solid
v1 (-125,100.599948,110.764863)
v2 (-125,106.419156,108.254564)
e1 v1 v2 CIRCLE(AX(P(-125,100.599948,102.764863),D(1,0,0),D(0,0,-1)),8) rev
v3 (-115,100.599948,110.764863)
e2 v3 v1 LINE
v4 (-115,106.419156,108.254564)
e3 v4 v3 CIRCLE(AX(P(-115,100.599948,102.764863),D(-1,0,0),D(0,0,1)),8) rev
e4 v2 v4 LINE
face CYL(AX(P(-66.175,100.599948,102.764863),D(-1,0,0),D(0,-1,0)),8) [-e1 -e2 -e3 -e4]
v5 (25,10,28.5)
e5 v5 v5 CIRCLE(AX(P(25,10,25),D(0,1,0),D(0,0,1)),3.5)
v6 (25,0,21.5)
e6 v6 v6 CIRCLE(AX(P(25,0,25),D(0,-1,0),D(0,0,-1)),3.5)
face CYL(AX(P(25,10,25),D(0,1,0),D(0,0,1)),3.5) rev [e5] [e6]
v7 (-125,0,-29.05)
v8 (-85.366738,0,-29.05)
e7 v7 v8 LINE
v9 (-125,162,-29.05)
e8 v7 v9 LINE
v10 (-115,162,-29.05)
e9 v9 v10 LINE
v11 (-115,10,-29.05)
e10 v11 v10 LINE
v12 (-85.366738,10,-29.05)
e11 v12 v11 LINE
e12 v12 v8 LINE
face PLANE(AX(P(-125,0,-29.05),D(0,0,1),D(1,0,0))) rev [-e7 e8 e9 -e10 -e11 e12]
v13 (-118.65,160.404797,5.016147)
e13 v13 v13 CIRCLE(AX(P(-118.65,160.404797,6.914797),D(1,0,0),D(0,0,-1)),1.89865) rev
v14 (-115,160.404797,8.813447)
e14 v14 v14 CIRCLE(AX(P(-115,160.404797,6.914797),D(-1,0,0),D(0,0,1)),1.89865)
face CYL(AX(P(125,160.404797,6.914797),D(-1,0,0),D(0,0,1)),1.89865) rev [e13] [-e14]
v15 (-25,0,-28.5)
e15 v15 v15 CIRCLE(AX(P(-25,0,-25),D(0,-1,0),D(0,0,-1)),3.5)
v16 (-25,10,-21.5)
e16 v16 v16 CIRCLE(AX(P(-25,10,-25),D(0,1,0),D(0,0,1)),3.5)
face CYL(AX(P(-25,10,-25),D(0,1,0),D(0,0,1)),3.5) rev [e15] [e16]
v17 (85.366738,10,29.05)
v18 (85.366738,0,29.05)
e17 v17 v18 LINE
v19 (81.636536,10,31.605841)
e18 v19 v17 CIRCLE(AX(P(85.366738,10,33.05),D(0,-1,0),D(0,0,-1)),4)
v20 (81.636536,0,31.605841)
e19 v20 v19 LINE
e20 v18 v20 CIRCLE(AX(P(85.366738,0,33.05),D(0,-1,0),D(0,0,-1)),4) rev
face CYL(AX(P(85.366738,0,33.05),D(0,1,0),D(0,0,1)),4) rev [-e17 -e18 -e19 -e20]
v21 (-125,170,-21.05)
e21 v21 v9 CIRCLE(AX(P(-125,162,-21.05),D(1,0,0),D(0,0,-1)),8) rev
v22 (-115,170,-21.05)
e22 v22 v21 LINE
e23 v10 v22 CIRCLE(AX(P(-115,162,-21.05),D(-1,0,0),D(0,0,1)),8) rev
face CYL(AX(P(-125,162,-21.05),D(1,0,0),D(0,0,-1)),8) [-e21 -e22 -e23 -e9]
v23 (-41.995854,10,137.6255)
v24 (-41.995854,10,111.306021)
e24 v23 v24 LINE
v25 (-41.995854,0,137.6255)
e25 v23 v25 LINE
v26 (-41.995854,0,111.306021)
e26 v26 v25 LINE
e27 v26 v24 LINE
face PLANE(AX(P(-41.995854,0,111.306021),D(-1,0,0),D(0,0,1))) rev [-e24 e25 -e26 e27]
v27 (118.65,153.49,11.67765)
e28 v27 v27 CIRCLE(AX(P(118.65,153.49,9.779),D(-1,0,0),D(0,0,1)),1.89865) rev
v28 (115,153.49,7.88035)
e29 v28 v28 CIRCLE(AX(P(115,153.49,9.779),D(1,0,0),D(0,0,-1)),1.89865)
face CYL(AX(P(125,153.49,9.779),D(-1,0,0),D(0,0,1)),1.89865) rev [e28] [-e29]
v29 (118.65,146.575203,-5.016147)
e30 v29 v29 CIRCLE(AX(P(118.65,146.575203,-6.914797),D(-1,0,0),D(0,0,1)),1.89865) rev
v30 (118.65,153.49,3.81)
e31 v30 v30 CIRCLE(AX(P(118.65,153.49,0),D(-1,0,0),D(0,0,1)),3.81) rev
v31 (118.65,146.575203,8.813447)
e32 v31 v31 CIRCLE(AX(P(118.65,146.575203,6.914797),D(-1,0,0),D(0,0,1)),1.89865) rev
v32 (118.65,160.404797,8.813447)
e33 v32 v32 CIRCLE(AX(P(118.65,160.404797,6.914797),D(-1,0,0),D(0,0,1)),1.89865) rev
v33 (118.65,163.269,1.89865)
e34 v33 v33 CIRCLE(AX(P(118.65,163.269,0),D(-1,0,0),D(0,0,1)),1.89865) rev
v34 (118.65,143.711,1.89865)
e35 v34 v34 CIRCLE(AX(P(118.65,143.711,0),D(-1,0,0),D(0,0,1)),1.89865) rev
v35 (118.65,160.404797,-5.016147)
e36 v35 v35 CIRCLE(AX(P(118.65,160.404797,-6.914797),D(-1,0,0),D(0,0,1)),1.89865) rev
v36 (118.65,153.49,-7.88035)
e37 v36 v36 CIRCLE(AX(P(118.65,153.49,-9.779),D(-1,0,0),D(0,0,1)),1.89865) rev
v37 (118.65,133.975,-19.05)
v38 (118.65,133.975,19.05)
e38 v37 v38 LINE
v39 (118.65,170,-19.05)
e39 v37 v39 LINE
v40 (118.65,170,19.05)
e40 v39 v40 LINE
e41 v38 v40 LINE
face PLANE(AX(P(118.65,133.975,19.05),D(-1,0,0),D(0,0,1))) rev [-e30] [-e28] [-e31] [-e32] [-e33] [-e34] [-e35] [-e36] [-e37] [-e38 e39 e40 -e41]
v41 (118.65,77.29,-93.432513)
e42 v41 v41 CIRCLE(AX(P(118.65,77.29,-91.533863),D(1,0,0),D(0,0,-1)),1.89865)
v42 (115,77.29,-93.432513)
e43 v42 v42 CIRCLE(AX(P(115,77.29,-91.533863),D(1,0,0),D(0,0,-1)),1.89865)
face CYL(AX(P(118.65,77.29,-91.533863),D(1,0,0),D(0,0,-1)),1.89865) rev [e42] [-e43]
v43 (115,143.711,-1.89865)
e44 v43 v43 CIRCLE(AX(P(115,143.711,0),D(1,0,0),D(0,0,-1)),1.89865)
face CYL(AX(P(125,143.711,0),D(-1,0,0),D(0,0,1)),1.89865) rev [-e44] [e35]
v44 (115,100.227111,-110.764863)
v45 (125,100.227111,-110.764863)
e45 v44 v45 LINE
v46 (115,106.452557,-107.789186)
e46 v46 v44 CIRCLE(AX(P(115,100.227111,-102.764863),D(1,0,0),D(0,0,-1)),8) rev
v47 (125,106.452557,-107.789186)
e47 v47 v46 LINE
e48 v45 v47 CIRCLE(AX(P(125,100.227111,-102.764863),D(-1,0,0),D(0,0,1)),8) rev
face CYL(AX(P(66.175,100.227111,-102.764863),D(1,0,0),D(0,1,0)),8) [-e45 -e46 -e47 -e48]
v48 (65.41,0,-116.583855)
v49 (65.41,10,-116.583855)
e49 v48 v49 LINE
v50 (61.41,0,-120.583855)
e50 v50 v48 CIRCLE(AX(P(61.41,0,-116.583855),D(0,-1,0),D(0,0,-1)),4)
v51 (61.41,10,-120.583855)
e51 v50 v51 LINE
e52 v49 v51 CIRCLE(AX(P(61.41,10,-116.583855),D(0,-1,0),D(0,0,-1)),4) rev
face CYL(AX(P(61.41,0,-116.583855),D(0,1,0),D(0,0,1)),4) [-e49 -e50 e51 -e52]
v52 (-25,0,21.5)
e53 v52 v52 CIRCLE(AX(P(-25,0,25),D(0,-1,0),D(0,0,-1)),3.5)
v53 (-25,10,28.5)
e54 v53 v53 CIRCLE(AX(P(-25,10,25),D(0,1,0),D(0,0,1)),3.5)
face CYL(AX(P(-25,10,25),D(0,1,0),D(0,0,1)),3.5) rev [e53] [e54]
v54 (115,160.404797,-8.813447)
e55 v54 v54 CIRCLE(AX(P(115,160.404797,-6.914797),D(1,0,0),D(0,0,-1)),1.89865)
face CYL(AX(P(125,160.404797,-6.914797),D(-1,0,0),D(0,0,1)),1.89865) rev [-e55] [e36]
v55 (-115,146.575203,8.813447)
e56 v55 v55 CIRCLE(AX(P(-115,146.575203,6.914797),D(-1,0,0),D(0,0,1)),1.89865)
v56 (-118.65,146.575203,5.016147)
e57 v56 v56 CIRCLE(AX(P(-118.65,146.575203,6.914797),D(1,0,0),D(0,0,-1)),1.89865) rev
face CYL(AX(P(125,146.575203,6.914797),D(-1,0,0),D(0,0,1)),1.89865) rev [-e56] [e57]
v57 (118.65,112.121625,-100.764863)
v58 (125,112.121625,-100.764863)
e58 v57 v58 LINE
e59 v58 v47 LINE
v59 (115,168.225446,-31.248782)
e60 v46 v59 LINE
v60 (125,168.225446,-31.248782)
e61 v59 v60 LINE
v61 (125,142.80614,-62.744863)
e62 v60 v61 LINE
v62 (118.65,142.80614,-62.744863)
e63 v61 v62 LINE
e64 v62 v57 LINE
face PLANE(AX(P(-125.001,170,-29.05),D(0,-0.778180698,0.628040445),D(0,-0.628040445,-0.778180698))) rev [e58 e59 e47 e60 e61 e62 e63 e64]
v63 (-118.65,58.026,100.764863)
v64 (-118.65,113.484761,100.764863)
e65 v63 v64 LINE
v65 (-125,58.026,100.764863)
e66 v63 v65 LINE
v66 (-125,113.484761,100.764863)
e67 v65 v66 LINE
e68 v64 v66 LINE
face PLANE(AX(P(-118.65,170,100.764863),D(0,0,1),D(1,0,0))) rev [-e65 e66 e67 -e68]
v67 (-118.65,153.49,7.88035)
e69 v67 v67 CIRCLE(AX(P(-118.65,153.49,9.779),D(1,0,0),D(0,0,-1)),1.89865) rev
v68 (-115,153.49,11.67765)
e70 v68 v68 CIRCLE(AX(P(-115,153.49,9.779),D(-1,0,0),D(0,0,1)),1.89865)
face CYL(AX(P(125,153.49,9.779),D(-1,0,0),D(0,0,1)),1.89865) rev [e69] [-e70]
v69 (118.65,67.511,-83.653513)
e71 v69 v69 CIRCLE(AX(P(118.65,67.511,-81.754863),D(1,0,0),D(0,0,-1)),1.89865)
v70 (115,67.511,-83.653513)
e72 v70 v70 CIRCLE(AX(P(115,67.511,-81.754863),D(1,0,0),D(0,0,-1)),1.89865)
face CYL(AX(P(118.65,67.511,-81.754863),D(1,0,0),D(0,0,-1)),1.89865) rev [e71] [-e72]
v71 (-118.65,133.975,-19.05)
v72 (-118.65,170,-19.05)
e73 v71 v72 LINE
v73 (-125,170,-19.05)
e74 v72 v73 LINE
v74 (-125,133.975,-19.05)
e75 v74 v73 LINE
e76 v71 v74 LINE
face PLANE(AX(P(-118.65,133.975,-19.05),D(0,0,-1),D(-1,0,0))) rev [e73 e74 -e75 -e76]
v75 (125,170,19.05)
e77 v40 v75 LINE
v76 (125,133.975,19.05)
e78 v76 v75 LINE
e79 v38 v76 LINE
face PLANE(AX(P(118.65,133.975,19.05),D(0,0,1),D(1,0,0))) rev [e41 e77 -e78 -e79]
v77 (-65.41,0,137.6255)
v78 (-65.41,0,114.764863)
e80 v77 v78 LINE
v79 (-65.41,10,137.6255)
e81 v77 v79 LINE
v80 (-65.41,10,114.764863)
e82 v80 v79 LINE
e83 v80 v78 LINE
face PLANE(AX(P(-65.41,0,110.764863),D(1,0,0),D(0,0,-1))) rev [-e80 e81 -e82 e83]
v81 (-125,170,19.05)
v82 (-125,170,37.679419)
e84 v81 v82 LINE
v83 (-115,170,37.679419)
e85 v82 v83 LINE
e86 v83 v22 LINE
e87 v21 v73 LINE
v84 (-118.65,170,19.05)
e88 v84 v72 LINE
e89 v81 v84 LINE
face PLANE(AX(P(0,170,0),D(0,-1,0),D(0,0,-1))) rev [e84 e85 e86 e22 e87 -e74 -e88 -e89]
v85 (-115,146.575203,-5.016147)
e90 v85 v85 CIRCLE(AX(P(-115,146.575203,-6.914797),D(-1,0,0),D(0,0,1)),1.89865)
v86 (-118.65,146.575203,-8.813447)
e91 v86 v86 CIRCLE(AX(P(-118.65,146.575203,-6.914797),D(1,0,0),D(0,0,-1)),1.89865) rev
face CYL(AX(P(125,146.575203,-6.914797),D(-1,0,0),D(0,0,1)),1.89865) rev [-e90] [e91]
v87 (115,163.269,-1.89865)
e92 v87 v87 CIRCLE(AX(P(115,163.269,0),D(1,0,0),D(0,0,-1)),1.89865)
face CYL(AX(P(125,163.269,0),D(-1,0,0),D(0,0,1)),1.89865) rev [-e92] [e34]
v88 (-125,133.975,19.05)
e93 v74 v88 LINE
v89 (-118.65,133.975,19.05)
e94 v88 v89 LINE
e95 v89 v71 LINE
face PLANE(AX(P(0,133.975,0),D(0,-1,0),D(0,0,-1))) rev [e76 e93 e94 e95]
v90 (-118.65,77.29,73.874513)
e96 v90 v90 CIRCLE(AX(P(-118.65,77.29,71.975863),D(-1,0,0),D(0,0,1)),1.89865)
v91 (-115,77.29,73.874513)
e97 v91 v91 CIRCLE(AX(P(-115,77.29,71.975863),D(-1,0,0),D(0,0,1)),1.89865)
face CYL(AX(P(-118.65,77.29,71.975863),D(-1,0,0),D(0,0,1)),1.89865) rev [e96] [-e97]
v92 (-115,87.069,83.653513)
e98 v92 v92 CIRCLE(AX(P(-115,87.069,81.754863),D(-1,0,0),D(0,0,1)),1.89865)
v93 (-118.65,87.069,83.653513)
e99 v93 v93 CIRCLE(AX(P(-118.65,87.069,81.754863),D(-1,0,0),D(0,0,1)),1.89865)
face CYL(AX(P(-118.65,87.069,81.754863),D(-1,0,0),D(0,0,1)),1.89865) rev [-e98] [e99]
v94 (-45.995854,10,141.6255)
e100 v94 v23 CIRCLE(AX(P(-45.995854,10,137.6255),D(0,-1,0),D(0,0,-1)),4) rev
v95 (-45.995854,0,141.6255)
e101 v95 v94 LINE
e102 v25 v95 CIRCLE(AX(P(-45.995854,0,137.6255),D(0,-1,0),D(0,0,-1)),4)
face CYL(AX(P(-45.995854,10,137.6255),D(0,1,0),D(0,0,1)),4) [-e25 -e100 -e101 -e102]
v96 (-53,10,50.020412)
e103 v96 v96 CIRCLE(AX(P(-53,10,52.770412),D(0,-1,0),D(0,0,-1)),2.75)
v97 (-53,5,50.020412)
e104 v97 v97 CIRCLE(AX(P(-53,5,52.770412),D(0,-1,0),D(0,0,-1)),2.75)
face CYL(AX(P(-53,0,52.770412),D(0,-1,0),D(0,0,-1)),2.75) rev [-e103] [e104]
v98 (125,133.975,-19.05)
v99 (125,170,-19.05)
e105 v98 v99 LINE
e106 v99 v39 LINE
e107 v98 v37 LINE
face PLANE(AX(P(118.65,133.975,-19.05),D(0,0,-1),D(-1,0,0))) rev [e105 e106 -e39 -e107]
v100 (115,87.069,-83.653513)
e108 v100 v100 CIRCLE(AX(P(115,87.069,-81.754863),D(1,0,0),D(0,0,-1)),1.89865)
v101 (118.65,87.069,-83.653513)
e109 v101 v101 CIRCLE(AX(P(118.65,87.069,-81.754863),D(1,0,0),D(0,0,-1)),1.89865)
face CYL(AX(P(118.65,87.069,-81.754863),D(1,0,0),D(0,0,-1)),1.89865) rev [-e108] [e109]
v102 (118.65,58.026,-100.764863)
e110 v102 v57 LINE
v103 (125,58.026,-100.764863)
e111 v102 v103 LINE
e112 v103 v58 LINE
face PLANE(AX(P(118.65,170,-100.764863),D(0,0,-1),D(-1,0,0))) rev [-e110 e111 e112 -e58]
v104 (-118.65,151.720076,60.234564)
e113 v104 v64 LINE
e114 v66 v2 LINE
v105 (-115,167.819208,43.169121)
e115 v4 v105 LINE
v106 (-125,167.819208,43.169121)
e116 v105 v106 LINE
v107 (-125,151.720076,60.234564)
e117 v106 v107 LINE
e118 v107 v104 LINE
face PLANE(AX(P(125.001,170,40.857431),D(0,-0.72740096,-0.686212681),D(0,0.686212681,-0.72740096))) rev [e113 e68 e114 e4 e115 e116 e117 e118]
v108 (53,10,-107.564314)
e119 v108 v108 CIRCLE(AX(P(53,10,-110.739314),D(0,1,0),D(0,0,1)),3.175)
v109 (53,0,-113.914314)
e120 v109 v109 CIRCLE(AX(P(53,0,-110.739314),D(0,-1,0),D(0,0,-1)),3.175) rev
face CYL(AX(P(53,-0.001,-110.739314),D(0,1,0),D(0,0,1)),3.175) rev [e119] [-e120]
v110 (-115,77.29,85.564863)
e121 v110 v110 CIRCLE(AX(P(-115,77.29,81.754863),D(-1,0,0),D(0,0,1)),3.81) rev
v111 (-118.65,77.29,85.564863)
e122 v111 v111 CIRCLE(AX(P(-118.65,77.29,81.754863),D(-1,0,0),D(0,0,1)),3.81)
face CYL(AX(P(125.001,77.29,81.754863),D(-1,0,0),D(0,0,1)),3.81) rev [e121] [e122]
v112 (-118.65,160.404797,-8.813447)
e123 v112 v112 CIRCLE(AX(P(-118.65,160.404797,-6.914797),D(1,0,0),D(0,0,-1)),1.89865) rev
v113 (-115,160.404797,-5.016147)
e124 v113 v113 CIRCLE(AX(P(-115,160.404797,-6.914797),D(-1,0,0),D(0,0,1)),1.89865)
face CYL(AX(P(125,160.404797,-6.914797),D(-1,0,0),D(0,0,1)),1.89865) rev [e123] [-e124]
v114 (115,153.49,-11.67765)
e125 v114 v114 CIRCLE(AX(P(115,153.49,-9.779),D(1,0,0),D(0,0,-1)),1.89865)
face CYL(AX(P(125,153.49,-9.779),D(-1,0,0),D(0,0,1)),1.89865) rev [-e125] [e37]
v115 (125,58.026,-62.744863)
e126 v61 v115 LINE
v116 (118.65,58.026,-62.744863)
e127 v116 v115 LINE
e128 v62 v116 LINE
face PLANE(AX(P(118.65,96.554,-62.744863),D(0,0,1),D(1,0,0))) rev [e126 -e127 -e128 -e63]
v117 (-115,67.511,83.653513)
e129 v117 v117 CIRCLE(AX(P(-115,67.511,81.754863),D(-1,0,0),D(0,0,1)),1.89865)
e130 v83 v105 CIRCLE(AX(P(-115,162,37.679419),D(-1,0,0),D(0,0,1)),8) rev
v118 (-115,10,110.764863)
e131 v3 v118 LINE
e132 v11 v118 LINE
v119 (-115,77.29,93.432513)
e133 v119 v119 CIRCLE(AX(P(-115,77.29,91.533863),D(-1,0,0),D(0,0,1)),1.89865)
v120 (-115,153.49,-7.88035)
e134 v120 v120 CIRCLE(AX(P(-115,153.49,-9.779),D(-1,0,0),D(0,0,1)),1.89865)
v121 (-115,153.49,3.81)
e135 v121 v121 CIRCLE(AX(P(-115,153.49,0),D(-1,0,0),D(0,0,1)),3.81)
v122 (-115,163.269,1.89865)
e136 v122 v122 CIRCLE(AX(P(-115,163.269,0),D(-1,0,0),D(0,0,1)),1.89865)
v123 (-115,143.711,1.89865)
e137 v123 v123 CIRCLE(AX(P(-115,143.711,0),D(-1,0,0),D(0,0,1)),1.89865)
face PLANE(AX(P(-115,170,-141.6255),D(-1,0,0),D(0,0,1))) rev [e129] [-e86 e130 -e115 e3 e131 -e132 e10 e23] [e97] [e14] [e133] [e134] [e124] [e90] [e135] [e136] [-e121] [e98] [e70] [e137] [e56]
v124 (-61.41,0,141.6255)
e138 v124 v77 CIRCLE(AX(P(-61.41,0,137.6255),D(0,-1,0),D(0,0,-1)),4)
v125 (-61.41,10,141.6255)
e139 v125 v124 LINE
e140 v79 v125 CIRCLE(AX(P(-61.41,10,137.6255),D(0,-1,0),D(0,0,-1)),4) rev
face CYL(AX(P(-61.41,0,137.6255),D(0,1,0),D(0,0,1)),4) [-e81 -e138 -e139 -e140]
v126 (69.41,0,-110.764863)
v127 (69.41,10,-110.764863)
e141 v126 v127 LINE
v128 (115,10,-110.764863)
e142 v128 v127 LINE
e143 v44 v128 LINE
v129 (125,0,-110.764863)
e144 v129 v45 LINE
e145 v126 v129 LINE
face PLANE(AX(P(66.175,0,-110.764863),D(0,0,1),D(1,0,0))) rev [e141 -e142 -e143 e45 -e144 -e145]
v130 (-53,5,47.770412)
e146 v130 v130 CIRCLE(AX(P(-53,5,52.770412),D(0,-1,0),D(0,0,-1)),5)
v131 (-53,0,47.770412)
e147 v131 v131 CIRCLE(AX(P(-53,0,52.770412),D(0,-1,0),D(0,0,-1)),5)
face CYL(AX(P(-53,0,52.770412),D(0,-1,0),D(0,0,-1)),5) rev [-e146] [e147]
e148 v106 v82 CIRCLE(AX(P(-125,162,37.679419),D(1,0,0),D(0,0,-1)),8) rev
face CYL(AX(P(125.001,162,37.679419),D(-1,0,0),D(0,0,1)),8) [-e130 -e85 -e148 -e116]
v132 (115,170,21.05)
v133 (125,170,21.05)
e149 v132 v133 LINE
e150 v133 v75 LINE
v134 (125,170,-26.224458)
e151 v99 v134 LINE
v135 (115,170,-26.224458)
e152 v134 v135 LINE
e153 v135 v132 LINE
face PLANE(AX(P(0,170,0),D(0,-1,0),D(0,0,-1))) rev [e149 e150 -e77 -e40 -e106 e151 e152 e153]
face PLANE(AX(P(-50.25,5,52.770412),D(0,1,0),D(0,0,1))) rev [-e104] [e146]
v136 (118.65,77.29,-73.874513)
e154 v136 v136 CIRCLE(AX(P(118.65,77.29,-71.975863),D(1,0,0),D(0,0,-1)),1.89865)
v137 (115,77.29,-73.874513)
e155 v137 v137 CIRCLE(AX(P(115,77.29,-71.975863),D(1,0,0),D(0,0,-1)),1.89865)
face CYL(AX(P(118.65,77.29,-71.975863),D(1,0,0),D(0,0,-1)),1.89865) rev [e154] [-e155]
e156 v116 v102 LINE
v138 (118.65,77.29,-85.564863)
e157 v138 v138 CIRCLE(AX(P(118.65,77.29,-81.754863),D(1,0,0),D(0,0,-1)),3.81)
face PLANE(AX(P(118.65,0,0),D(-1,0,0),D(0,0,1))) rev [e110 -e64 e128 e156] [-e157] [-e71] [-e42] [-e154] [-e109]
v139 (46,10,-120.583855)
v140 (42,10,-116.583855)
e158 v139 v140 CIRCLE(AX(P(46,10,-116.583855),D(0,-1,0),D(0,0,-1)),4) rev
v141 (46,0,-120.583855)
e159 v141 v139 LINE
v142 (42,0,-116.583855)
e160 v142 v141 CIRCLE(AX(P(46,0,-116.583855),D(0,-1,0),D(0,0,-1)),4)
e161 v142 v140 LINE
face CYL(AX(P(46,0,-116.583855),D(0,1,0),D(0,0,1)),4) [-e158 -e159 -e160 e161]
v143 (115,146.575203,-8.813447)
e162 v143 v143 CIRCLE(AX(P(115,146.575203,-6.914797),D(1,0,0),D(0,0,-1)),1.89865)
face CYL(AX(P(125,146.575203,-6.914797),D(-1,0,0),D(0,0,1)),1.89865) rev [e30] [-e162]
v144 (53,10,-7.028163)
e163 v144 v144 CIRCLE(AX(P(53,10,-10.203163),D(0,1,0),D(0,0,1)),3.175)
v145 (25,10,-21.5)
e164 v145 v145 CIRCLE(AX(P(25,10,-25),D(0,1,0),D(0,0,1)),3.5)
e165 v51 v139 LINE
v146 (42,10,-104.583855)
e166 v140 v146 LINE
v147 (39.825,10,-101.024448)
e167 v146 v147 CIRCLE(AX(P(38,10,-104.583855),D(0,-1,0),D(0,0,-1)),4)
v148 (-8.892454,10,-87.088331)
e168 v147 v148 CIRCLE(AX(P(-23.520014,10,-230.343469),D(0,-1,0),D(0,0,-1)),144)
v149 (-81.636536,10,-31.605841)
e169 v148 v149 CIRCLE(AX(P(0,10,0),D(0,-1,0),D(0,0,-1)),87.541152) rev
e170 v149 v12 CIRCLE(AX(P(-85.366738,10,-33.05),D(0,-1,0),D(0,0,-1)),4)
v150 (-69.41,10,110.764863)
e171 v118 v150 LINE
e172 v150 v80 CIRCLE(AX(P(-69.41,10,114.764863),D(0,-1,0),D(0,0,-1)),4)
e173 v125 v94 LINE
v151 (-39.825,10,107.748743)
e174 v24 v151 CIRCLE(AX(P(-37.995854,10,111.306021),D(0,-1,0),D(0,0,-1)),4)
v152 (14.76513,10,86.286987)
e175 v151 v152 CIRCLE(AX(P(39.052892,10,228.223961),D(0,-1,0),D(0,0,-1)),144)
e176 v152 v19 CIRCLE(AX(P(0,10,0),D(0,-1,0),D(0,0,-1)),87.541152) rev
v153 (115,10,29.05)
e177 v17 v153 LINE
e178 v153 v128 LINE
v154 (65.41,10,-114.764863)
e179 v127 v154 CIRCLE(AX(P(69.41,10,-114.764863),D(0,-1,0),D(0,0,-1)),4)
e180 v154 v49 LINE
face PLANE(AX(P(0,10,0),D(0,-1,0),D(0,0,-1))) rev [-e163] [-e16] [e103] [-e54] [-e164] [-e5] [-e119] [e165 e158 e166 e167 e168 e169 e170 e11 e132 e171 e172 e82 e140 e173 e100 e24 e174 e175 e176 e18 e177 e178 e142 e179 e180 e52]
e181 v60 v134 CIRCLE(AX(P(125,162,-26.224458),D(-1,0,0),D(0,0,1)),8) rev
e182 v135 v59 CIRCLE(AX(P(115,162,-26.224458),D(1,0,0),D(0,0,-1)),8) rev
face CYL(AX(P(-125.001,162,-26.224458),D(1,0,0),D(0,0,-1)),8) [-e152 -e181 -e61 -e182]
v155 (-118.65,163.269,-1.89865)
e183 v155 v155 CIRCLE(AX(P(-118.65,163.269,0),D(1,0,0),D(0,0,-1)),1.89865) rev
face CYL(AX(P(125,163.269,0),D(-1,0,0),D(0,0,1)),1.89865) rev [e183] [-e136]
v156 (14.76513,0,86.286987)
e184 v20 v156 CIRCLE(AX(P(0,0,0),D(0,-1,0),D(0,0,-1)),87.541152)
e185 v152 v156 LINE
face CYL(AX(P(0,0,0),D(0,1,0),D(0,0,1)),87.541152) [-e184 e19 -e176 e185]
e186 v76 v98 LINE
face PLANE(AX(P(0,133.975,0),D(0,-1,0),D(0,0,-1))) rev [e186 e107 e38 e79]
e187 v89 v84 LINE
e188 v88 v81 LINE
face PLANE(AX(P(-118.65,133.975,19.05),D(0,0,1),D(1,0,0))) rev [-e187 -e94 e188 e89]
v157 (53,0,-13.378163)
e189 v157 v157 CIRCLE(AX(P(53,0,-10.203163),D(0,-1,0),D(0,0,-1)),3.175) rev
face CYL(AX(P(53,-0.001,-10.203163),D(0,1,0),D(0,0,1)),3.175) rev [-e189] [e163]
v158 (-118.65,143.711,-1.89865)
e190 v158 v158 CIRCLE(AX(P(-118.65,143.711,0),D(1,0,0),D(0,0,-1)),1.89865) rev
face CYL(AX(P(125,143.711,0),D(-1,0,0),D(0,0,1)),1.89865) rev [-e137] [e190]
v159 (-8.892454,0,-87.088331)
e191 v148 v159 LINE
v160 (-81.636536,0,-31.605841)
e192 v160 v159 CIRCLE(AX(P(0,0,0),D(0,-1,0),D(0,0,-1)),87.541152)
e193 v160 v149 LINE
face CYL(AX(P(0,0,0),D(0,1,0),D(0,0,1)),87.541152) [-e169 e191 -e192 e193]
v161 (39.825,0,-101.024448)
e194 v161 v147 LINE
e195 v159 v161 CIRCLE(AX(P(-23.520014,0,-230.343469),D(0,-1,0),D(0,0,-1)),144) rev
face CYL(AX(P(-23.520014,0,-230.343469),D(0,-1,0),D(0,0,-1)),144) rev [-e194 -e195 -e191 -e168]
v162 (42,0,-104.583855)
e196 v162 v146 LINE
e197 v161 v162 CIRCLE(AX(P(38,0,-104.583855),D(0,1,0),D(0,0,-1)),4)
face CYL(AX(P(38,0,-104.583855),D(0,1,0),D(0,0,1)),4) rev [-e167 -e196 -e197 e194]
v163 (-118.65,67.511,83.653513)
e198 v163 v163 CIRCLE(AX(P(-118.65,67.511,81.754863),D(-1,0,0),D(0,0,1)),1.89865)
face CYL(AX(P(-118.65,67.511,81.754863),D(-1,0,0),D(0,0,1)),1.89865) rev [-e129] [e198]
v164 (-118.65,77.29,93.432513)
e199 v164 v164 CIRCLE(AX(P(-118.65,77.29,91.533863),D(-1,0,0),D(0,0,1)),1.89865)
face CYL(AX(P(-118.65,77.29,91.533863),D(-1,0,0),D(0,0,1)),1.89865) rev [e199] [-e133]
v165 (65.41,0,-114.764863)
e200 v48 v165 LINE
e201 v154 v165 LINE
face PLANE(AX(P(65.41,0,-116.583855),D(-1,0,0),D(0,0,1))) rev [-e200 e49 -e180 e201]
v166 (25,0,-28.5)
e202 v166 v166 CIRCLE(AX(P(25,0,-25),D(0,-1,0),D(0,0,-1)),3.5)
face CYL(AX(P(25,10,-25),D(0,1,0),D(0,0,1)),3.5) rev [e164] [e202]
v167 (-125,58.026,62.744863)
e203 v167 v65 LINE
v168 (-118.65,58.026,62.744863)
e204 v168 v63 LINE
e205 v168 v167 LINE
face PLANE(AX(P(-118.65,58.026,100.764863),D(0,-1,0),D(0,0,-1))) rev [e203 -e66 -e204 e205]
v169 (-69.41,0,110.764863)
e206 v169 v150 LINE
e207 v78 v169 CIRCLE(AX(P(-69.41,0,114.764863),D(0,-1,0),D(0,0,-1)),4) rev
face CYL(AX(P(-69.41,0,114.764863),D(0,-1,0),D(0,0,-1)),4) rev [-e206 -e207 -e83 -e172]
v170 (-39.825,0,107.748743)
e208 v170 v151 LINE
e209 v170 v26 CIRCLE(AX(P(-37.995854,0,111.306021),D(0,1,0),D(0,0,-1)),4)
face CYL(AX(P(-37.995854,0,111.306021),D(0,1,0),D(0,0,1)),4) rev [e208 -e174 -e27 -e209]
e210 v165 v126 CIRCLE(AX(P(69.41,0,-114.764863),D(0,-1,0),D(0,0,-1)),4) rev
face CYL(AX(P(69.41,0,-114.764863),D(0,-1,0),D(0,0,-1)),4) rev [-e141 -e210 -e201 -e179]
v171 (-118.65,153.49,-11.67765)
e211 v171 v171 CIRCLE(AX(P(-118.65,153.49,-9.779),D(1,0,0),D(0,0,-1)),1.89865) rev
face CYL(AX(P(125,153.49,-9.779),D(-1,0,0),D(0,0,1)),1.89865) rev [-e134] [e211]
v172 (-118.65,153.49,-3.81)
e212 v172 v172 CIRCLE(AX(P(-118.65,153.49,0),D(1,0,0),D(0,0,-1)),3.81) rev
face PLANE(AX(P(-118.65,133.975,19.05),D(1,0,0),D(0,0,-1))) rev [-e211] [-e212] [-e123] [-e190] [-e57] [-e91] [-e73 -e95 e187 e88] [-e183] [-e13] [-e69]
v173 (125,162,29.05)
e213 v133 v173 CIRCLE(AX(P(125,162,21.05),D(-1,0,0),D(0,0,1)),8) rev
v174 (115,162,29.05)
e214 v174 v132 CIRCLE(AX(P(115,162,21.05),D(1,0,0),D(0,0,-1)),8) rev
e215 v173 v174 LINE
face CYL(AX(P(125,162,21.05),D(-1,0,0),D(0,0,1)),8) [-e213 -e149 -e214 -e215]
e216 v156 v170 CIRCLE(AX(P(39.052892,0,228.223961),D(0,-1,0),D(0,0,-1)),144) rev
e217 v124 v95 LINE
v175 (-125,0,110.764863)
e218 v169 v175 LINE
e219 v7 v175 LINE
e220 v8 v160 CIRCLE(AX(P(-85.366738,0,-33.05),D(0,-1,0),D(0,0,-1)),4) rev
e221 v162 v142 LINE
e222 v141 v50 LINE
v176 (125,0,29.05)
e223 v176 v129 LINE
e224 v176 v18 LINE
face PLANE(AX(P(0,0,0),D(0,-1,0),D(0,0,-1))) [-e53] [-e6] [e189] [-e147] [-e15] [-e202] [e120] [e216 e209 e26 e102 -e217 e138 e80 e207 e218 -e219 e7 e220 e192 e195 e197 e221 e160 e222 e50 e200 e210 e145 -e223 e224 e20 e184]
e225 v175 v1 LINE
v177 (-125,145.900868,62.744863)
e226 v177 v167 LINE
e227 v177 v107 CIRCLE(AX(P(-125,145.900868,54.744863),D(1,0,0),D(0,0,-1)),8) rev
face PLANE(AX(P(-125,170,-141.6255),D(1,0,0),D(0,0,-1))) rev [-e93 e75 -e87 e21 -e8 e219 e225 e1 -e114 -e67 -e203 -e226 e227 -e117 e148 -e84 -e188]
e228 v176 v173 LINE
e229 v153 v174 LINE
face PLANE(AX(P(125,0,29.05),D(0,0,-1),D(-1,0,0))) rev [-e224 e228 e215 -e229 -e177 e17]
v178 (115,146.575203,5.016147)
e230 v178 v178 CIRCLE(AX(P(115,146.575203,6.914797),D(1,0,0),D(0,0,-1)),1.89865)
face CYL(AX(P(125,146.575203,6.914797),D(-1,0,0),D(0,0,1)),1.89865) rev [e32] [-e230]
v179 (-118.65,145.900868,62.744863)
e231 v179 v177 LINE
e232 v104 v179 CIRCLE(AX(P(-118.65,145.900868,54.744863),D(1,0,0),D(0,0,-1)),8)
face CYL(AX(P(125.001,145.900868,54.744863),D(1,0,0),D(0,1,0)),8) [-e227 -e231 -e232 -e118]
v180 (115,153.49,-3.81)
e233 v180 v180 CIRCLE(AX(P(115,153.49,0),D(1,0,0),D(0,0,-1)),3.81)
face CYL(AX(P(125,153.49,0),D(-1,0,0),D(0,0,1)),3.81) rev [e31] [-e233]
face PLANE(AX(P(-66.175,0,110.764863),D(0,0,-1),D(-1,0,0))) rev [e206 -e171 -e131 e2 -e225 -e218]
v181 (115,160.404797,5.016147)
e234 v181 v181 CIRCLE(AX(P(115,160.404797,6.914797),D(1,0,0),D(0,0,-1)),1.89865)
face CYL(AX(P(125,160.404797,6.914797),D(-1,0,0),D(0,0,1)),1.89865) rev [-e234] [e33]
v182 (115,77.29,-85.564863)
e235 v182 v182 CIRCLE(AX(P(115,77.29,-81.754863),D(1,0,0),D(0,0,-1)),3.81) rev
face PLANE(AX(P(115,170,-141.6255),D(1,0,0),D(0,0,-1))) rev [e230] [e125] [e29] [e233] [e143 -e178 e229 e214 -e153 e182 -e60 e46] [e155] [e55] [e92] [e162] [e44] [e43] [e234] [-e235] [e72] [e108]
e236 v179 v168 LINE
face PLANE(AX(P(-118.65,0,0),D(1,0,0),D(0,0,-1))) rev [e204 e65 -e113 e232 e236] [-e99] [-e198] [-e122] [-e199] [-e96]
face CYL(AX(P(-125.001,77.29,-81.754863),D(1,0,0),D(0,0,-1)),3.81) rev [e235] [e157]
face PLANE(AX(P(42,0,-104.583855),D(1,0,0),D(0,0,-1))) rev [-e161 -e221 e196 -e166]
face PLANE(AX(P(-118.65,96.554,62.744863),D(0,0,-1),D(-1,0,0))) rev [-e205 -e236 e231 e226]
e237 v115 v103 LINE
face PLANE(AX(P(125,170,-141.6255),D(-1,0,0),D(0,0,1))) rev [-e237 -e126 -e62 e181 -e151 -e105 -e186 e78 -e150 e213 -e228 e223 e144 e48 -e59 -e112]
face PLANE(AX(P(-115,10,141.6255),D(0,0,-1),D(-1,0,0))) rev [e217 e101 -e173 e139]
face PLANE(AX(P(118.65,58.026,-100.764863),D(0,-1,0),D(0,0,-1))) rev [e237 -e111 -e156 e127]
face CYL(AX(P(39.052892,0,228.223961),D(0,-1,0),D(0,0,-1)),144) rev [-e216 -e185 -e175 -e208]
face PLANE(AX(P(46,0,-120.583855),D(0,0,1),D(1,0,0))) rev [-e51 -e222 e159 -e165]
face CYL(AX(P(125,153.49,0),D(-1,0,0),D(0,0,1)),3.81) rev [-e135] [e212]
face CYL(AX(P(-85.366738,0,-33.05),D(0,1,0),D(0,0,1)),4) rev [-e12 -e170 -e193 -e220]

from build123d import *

# Parameters (mm, degrees)
SKETCH2_W                      = 230
SKETCH2_H                      = 283.251
BOSS_EXTRUDE1_DEPTH            = 10
SKETCH3_W                      = 10
SKETCH3_H                      = 283.251
BOSS_EXTRUDE2_DEPTH            = 170
M6_CLEARANCE_HOLE1_D           = 7
CUT_EXTRUDE1_DEPTH             = 327.431895271
CUT_EXTRUDE1_DEPTH_BACK        = 327.431895271
SKETCH7_R                      = 3.81
SKETCH7_R_2                    = 1.89865
SKETCH8_W                      = 6.35
SKETCH8_H                      = 38.1
CUT_EXTRUDE2_DEPTH             = 36.025
CUT_EXTRUDE3_DEPTH             = 6.35
CUT_EXTRUDE4_REACH             = 331.125
SKETCH11_R                     = 3.81
F_6_CLEARANCE_HOLE1_D          = 3.7973
F_6_CLEARANCE_HOLE1_DEPTH      = 3.65
CIRPATTERN1_COUNT              = 2
ENL_V_MAT_EXTRU_1_REACH        = 249.554
ESQUISSE1_R                    = 3.175
CBORE_FOR_M5_SHCS1_D           = 5.5
CBORE_FOR_M5_SHCS1_CBORE_D     = 10
CBORE_FOR_M5_SHCS1_CBORE_DEPTH = 5
CUT_EXTRUDE5_DEPTH             = 248.553594703
CUT_EXTRUDE5_DEPTH_BACK        = 248.553594703
SKETCH15_W                     = 58.825
SKETCH15_H                     = 30.860637148
CUT_EXTRUDE7_DEPTH             = 248.553594703
CUT_EXTRUDE7_DEPTH_BACK        = 248.553594703
SKETCH20_W                     = 0.765
SKETCH20_H                     = 30.860637148
FILLET2_R                      = 4
FILLET3_R                      = 144
FILLET4_R                      = 4
CUT_EXTRUDE8_REACH             = 335.853
CUT_EXTRUDE9_REACH             = 335.853
FILLET5_R                      = 8
FILLET6_R                      = 8


with BuildPart() as part:
    # Sketch2 → Boss-Extrude1 (new body)
    with BuildSketch(Plane(origin=(0, 0, 0), x_dir=(1, 0, 0), z_dir=(0, 1, 0))):
        Rectangle(SKETCH2_W, SKETCH2_H)
    extrude(amount=BOSS_EXTRUDE1_DEPTH)

    # Sketch3 → Boss-Extrude2 (add)
    with BuildSketch(Plane(origin=(0, 0, 0), x_dir=(1, 0, 0), z_dir=(0, 1, 0))):
        with Locations((-120, 0)):
            Rectangle(SKETCH3_W, SKETCH3_H)
        with Locations((120, 0)):
            Rectangle(SKETCH3_W, SKETCH3_H)
    extrude(amount=BOSS_EXTRUDE2_DEPTH)

    # M6 Clearance Hole1 (through all)
    with Locations(Plane(origin=(0, 10, 0), x_dir=(1, 0, 0), z_dir=(0, 1, 0))):
        with Locations((-25, 25), (25, 25), (25, -25), (-25, -25)):
            Hole(M6_CLEARANCE_HOLE1_D / 2)

    # Sketch7 → Cut-Extrude1 (cut, two sides: drawn at the far end of the back side and taken through both)
    with BuildSketch(Plane.ZY.offset(-115).offset(-CUT_EXTRUDE1_DEPTH_BACK)):
        with Locations((0, 153.49)):
            Circle(SKETCH7_R)
        with Locations((0, 163.269)):
            Circle(SKETCH7_R_2)
        with Locations((6.914797213, 160.404797213)):
            Circle(SKETCH7_R_2)
        with Locations((9.779, 153.49)):
            Circle(SKETCH7_R_2)
        with Locations((6.914797213, 146.575202787)):
            Circle(SKETCH7_R_2)
        with Locations((0, 143.711)):
            Circle(SKETCH7_R_2)
        with Locations((-6.914797213, 146.575202787)):
            Circle(SKETCH7_R_2)
        with Locations((-9.779, 153.49)):
            Circle(SKETCH7_R_2)
        with Locations((-6.914797213, 160.404797213)):
            Circle(SKETCH7_R_2)
    extrude(amount=CUT_EXTRUDE1_DEPTH + CUT_EXTRUDE1_DEPTH_BACK, mode=Mode.SUBTRACT)

    # Sketch8 → Cut-Extrude2 (cut)
    with BuildSketch(Plane(origin=(0, 170, 0), x_dir=(1, 0, 0), z_dir=(0, 1, 0))):
        with Locations((121.825, 0)):
            Rectangle(SKETCH8_W, SKETCH8_H)
        with Locations((-121.825, 0)):
            Rectangle(SKETCH8_W, SKETCH8_H)
    extrude(amount=-CUT_EXTRUDE2_DEPTH, mode=Mode.SUBTRACT)

    # Sketch9 → Cut-Extrude3 (cut)
    with BuildSketch(Plane(origin=(125, 0, 0), x_dir=(0, 0, -1), z_dir=(1, 0, 0))):
        Polygon((100.764862852, 96.554), (100.764862852, 58.026), (62.744862852, 58.026), (62.744862852, 96.554), (62.744862852, 170), (100.764862852, 170), align=None)
    cut_extrude3 = extrude(amount=-CUT_EXTRUDE3_DEPTH, mode=Mode.SUBTRACT)

    # Sketch11 → Cut-Extrude4 (cut, up to next)
    with BuildSketch(Plane(origin=(118.65, 0, 0), x_dir=(0, 0, -1), z_dir=(1, 0, 0)), mode=Mode.PRIVATE) as cut_extrude4_sk1:
        with Locations((81.754862852, 77.29)):
            Circle(SKETCH11_R)
    cut_extrude4_tool1 = extrude(cut_extrude4_sk1.sketch, amount=-CUT_EXTRUDE4_REACH, mode=Mode.PRIVATE) & part.part
    cut_extrude4 = cut_extrude4_tool1.solids().sort_by_distance((118.65, 77.29, -81.754863))[0]
    add(cut_extrude4, mode=Mode.SUBTRACT)

    # #6 Clearance Hole1
    with Locations(Plane(origin=(118.65, 0, 0), x_dir=(0, 0, -1), z_dir=(1, 0, 0))):
        with Locations((81.754862852, 87.069), (71.975862852, 77.29), (91.533862852, 77.29), (81.754862852, 67.511)):
            f_6_clearance_hole1 = Hole(F_6_CLEARANCE_HOLE1_D / 2, depth=F_6_CLEARANCE_HOLE1_DEPTH)

    # CirPattern1: Cut-Extrude3, Cut-Extrude4, #6 Clearance Hole1 ×2 about axis
    cirpattern1_axis = Axis((0, 0, 0), (0, 1, 0))
    add([cut_extrude3.rotate(cirpattern1_axis, i * 360 / CIRPATTERN1_COUNT) for i in range(1, CIRPATTERN1_COUNT)], mode=Mode.SUBTRACT)
    add([cut_extrude4.rotate(cirpattern1_axis, i * 360 / CIRPATTERN1_COUNT) for i in range(1, CIRPATTERN1_COUNT)], mode=Mode.SUBTRACT)
    add([f_6_clearance_hole1.rotate(cirpattern1_axis, i * 360 / CIRPATTERN1_COUNT) for i in range(1, CIRPATTERN1_COUNT)], mode=Mode.SUBTRACT)

    # Esquisse1 → Enlèv. mat.-Extru.1 (cut, up to next)
    with BuildSketch(Plane(origin=(0, 10, 0), x_dir=(1, 0, 0), z_dir=(0, 1, 0)), mode=Mode.PRIVATE) as enl_v_mat_extru_1_sk1:
        with Locations(Location((53, 110.739314032, 0), (0, 0, 270))):
            Circle(ESQUISSE1_R)
    enl_v_mat_extru_1_tool1 = extrude(enl_v_mat_extru_1_sk1.sketch, amount=-ENL_V_MAT_EXTRU_1_REACH, mode=Mode.PRIVATE) & part.part
    # Esquisse1 → Enlèv. mat.-Extru.1 (cut, up to next)
    with BuildSketch(Plane(origin=(0, 10, 0), x_dir=(1, 0, 0), z_dir=(0, 1, 0)), mode=Mode.PRIVATE) as enl_v_mat_extru_1_sk2:
        with Locations(Location((53, 10.203163452, 0), (0, 0, 270))):
            Circle(ESQUISSE1_R)
    enl_v_mat_extru_1_tool2 = extrude(enl_v_mat_extru_1_sk2.sketch, amount=-ENL_V_MAT_EXTRU_1_REACH, mode=Mode.PRIVATE) & part.part
    add(enl_v_mat_extru_1_tool1.solids().sort_by_distance((53, 10, -110.739314))[0], mode=Mode.SUBTRACT)
    add(enl_v_mat_extru_1_tool2.solids().sort_by_distance((53, 10, -10.203163))[0], mode=Mode.SUBTRACT)

    # CBORE for M5 SHCS1 (through all)
    with Locations(Plane(origin=(0, 0, 0), x_dir=(-1, 0, 0), z_dir=(0, -1, 0))):
        with Locations((53, -52.770411672), (53, -153.306562253)):
            CounterBoreHole(CBORE_FOR_M5_SHCS1_D / 2, CBORE_FOR_M5_SHCS1_CBORE_D / 2, CBORE_FOR_M5_SHCS1_CBORE_DEPTH)

    # Sketch15 → Cut-Extrude5 (cut, two sides: drawn at the far end of the back side and taken through both)
    with BuildSketch(Plane(origin=(0, 10, 0), x_dir=(1, 0, 0), z_dir=(0, 1, 0)).offset(-CUT_EXTRUDE5_DEPTH_BACK)):
        with BuildLine():
            Line((125, 141.6255), (-125, 141.6255))
            Line((-125, 141.6255), (-125, 29.05))
            Line((-125, 29.05), (-82.580571034, 29.05))
            ThreePointArc((-82.580571034, 29.05), (-32.48081845, 81.292371383), (39.825, 77.957825696))
            Line((39.825, 77.957825696), (39.825, 123.914314032))
            Line((39.825, 123.914314032), (66.175, 123.914314032))
            Line((66.175, 123.914314032), (66.175, 110.764862852))
            Line((66.175, 110.764862852), (125, 110.764862852))
            Line((125, 110.764862852), (125, 141.6255))
        make_face()
        with BuildLine():
            Line((125, -141.6255), (125, -29.05))
            Line((125, -29.05), (82.580571034, -29.05))
            ThreePointArc((82.580571034, -29.05), (32.48081845, -81.292371383), (-39.825, -77.957825696))
            Line((-39.825, -77.957825696), (-39.825, -141.6255))
            Line((-39.825, -141.6255), (125, -141.6255))
        make_face()
        with Locations((-95.5875, -126.195181426)):
            Rectangle(SKETCH15_W, SKETCH15_H)
    extrude(amount=CUT_EXTRUDE5_DEPTH + CUT_EXTRUDE5_DEPTH_BACK, mode=Mode.SUBTRACT)

    # Sketch20 → Cut-Extrude7 (cut, two sides: drawn at the far end of the back side and taken through both)
    with BuildSketch(Plane(origin=(0, 10, 0), x_dir=(1, 0, 0), z_dir=(0, 1, 0)).offset(-CUT_EXTRUDE7_DEPTH_BACK)):
        with Locations((-65.7925, -126.195181426)):
            Rectangle(SKETCH20_W, SKETCH20_H)
        with BuildLine():
            Line((-39.825, -141.6255), (-39.825, -107.748743461))
            ThreePointArc((-39.825, -107.748743461), (-41.410278355, -109.222344653), (-41.995854347, -111.306021378))
            Line((-41.995854347, -111.306021378), (-41.995854347, -141.6255))
            Line((-41.995854347, -141.6255), (-39.825, -141.6255))
        make_face()
        with BuildLine():
            Line((39.825, 123.914314032), (66.175, 123.914314032))
            Line((66.175, 123.914314032), (66.175, 110.764862852))
            Line((66.175, 110.764862852), (65.41, 110.764862852))
            Line((65.41, 110.764862852), (65.41, 116.58385488))
            ThreePointArc((65.41, 116.58385488), (64.238427125, 119.412282005), (61.41, 120.58385488))
            Line((61.41, 120.58385488), (46, 120.58385488))
            ThreePointArc((46, 120.58385488), (43.171572875, 119.412282005), (42, 116.58385488))
            Line((42, 116.58385488), (42, 104.58385488))
            ThreePointArc((42, 104.58385488), (41.413209633, 102.498189519), (39.825, 101.024448329))
            Line((39.825, 101.024448329), (39.825, 123.914314032))
        make_face()
    extrude(amount=CUT_EXTRUDE7_DEPTH + CUT_EXTRUDE7_DEPTH_BACK, mode=Mode.SUBTRACT)

    # Fillet2
    fillet2_edges = [part.edges().sort_by_distance(p)[0] for p in [
        (-65.41, 5, 141.6255),
        (-41.995854347, 5, 141.6255),
    ]]
    fillet(fillet2_edges, radius=FILLET2_R)

    # Fillet3
    # the kernel refuses this fillet: 144 mm, written as the material it adds along each edge
    with BuildSketch(Plane(origin=(39.825, 0, -77.957825696), x_dir=(-0.9828868635298122, 0, -0.18421024265911018), z_dir=(0, 1, 0))) as fillet3_piece_1:
        with BuildLine():
            CenterArc((90.33197894, -138.109046644), FILLET3_R, 106.445268475, 20.267064332)
            Line((4.249108153, -22.671880372), (2.527450737, -20.363137046))
            ThreePointArc((2.527450737, -20.363137046), (-0.706160091, -11.866465685), (-2.830714167, -0.530525499))
            Line((-2.830714167, -0.530525499), (0.815326005, 2.762180933))
            ThreePointArc((0.815326005, 2.762180933), (24.782839351, -0.701255836), (48.750352698, 2.762180933))
            Line((48.750352698, 2.762180933), (49.565678703, 0))
        make_face()
    extrude(amount=10)
    with BuildSketch(Plane(origin=(-39.825, 10, 77.957825696), x_dir=(0, 0, 1), z_dir=(0, -1, 0))) as fillet3_piece_2:
        with BuildLine():
            CenterArc((150.266135455, -78.877892483), FILLET3_R, 146.786309889, 23.503480659)
            Line((8.329161454, -54.590129896), (5.490421974, -54.104374645))
            ThreePointArc((5.490421974, -54.104374645), (5.734767963, -27.055491549), (-2.564719952, -1.310195239))
            Line((-2.564719952, -1.310195239), (0, 2.88))
            ThreePointArc((0, 2.88), (14.895458882, 2.88), (27.381413411, 1.57755785))
            Line((27.381413411, 1.57755785), (29.790917765, 0))
        make_face()
    extrude(amount=10)

    # Fillet4
    fillet4_edges = [part.edges().sort_by_distance(p)[0] for p in [
        (-82.580571034, 5, -29.05),
        (82.580571034, 5, 29.05),
        (-65.41, 5, 110.764862852),
        (65.41, 5, -110.764862852),
    ]]
    fillet(fillet4_edges, radius=FILLET4_R)

    # Sketch22 → Cut-Extrude8 (cut, up to next)
    with BuildSketch(Plane.ZY.offset(125), mode=Mode.PRIVATE) as cut_extrude8_sk1:
        Polygon((40.857431426, 170), (110.764862852, 104.051), (110.764862852, 170), align=None)
    cut_extrude8_tool1 = extrude(cut_extrude8_sk1.sketch, amount=-CUT_EXTRUDE8_REACH, mode=Mode.PRIVATE) & part.part
    add(cut_extrude8_tool1.solids().sort_by_distance((-125, 148.017, 87.462386))[0], mode=Mode.SUBTRACT)

    # Sketch23 → Cut-Extrude9 (cut, up to next)
    with BuildSketch(Plane(origin=(125, 0, 0), x_dir=(0, 0, -1), z_dir=(1, 0, 0)), mode=Mode.PRIVATE) as cut_extrude9_sk1:
        Polygon((29.05, 170), (110.764862852, 104.051), (110.764862852, 170), align=None)
    cut_extrude9_tool1 = extrude(cut_extrude9_sk1.sketch, amount=-CUT_EXTRUDE9_REACH, mode=Mode.PRIVATE) & part.part
    add(cut_extrude9_tool1.solids().sort_by_distance((125, 148.017, -83.526575))[0], mode=Mode.SUBTRACT)

    # Fillet5
    fillet5_edges = [part.edges().sort_by_distance(p)[0] for p in [
        (-120, 170, -29.05),
        (120, 170, 29.05),
        (-120, 170, 40.857431426),
        (-120, 104.051, 110.764862852),
        (120, 170, -29.05),
        (120, 104.051, -110.764862852),
    ]]
    fillet(fillet5_edges, radius=FILLET5_R)

    # Fillet6
    fillet6_edges = [part.edges().sort_by_distance(p)[0] for p in [
        (-121.825, 149.351920308, 62.744862852),
    ]]
    fillet(fillet6_edges, radius=FILLET6_R)


solid = part.part
